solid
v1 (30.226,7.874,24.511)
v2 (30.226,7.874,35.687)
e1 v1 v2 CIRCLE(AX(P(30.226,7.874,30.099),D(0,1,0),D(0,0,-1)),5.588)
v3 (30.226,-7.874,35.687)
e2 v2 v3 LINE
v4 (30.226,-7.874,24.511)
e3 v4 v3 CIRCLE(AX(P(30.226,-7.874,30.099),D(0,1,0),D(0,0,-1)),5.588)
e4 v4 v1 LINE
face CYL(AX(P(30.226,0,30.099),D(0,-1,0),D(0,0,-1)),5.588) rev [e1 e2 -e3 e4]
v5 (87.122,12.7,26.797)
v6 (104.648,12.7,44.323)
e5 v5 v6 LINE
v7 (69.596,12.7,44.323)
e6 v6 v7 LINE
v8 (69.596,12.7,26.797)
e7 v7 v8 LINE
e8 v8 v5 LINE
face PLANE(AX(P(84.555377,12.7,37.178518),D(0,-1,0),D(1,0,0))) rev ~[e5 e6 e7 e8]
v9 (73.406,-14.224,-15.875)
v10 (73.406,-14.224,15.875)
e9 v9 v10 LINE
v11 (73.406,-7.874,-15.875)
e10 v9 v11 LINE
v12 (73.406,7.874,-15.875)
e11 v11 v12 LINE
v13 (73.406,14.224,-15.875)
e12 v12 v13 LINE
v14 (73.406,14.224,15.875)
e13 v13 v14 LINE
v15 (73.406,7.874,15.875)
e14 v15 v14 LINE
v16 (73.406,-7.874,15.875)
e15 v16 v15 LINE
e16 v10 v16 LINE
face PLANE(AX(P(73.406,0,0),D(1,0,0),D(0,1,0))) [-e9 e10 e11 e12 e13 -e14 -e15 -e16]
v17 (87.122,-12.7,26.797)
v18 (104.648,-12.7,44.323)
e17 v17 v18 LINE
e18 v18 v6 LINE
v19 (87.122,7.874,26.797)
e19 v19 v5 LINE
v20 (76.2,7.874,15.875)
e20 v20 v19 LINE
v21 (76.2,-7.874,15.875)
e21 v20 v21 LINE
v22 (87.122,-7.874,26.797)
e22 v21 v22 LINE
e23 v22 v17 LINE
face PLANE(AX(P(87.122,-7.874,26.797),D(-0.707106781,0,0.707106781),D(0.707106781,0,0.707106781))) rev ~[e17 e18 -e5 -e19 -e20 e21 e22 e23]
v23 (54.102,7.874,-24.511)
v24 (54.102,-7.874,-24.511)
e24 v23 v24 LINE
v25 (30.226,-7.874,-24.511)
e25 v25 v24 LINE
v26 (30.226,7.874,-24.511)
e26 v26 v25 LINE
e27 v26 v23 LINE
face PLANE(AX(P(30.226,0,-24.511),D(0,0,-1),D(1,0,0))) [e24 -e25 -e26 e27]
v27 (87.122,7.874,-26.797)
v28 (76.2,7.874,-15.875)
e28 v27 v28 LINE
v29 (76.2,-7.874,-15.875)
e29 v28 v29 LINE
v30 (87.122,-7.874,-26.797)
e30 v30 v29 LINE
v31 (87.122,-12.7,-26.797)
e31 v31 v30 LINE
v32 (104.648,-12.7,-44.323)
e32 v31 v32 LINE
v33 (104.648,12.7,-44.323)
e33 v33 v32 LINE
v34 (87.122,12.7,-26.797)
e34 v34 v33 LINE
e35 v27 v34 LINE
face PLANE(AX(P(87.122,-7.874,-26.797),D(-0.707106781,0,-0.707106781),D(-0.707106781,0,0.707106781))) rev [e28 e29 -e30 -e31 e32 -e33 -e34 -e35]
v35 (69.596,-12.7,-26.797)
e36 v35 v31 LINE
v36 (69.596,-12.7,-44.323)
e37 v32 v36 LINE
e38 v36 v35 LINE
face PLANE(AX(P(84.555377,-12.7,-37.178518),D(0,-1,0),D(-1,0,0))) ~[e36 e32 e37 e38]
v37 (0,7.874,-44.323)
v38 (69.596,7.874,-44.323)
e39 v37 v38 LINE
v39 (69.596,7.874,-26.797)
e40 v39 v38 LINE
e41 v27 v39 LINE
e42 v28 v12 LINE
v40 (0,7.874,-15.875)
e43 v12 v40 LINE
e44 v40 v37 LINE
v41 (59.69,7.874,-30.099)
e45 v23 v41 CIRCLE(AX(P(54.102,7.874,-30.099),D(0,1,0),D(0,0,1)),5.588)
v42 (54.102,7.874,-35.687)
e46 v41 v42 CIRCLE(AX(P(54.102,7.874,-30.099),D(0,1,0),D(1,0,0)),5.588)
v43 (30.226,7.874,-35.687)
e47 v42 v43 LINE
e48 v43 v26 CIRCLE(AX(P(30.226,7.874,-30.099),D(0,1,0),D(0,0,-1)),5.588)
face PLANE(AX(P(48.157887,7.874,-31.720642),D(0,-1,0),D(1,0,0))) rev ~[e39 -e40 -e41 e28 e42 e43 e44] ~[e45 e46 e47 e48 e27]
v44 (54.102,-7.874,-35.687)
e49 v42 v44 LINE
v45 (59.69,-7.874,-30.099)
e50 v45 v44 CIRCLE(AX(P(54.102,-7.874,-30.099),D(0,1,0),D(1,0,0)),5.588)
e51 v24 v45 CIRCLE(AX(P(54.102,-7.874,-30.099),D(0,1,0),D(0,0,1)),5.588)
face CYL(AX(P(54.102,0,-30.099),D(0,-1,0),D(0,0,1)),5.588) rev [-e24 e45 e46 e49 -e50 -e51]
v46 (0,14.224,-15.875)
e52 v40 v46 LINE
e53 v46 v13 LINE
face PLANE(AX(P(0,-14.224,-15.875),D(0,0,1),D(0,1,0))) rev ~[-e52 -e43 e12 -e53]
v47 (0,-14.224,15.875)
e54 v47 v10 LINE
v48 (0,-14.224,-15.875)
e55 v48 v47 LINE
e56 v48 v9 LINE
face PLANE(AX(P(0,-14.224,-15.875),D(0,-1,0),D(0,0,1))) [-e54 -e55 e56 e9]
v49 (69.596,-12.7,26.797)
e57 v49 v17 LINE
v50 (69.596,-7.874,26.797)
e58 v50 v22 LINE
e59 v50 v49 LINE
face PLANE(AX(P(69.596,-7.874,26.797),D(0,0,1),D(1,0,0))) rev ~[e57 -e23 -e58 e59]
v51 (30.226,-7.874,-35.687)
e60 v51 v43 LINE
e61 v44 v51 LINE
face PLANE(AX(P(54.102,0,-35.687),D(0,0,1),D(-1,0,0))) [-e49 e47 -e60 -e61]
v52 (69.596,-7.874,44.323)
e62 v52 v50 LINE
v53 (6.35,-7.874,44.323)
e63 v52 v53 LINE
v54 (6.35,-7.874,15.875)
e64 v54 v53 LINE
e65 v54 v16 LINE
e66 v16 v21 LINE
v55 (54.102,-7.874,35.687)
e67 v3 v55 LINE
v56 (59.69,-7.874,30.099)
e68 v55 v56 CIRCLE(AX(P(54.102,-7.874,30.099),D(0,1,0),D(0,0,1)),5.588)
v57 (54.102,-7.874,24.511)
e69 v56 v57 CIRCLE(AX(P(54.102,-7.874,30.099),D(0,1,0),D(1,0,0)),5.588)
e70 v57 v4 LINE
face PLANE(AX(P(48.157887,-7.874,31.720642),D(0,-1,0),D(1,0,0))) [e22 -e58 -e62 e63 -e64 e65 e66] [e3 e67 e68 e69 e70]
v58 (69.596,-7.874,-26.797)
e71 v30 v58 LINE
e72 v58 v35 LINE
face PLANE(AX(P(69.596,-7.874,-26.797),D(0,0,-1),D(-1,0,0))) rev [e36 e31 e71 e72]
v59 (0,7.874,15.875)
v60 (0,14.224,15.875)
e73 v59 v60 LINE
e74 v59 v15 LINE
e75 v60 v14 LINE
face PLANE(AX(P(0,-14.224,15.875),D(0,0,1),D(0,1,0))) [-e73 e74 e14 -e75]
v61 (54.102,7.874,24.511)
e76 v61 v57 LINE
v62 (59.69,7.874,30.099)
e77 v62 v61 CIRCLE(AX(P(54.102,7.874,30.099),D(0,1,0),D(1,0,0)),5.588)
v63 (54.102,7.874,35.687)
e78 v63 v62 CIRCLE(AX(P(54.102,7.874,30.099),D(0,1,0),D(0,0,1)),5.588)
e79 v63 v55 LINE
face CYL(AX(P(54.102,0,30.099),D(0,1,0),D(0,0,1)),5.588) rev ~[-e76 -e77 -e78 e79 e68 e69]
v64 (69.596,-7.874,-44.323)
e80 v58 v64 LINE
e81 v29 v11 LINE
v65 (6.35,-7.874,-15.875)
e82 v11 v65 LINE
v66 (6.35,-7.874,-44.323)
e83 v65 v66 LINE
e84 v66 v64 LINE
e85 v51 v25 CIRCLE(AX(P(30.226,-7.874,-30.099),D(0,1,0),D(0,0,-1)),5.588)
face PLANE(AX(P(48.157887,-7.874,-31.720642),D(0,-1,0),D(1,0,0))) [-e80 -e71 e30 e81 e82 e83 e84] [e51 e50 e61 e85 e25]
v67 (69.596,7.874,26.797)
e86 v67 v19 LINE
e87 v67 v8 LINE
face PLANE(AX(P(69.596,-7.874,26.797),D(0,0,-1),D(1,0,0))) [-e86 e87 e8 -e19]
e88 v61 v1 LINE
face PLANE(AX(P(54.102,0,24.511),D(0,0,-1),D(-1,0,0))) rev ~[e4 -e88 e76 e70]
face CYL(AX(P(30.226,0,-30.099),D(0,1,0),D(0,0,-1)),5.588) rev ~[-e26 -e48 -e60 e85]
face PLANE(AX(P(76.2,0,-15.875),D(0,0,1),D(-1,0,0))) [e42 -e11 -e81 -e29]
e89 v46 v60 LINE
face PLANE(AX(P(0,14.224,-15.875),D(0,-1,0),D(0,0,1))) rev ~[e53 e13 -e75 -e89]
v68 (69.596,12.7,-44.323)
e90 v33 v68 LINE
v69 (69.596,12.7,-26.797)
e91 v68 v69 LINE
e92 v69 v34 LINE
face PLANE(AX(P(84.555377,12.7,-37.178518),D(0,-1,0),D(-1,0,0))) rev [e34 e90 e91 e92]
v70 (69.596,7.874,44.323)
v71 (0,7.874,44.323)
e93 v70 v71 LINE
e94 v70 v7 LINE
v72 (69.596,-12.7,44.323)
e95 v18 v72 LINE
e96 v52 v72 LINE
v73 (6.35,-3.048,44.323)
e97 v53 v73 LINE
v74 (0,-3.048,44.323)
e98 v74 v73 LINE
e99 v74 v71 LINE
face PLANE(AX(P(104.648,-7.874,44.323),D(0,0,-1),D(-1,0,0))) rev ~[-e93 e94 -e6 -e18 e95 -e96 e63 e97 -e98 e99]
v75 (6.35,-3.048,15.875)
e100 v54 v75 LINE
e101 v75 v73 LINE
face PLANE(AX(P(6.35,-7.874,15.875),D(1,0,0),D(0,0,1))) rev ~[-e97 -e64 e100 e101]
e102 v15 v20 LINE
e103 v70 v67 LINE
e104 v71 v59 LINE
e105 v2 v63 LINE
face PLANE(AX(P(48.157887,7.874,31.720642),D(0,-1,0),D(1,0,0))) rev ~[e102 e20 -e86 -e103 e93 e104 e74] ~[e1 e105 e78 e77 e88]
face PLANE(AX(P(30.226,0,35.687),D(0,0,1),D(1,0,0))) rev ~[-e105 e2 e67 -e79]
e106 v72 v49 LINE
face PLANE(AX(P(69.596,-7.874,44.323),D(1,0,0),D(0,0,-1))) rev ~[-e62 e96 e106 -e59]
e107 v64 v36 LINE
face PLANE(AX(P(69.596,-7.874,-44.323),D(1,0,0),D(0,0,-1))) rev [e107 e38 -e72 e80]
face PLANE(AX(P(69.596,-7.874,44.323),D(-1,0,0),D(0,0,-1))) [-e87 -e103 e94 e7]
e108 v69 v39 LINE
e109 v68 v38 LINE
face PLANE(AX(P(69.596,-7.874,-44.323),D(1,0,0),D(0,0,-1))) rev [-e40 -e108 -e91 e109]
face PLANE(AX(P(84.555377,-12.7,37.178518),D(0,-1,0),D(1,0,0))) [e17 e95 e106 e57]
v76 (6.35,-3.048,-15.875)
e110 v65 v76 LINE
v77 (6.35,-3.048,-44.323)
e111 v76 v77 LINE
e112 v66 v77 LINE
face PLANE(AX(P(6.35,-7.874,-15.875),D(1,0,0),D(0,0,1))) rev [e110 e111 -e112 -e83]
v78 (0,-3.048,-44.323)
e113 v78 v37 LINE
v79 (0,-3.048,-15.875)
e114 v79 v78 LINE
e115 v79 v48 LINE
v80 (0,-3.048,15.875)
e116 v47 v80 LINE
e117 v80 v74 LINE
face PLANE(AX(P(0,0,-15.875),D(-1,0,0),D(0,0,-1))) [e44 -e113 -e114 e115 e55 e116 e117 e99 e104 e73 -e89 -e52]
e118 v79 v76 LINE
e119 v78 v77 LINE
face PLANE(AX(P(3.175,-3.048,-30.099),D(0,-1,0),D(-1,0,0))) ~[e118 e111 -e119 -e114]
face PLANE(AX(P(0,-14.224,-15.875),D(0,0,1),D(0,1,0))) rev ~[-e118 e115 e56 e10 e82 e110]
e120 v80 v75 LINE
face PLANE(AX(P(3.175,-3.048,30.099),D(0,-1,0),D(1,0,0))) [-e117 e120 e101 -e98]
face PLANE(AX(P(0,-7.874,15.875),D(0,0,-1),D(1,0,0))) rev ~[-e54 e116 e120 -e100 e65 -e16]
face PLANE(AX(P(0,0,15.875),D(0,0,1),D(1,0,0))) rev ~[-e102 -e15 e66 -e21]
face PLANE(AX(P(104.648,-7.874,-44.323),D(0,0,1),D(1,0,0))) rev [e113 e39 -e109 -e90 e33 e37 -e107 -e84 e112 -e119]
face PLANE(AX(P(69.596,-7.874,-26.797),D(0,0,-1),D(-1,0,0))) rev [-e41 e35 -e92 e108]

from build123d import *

# Parameters (mm, degrees)
F0_W          = 28.448
F0_H          = 31.75
F1_DEPTH      = 73.406
F3_DEPTH      = 7.874
F4_W          = 6.35
F4_H          = 28.448
F5_DEPTH      = 4.826
F6_DEPTH      = 4.826
F6_DEPTH_BACK = 20.574


# Not quite as in the source:
# - a pattern or mirror of a feature is missing from the dataset's text; its kind, count and spacing are read off the source's solid


with BuildPart() as f1:
    # F0 (on Right) → F1 (new body)
    with BuildSketch(Plane.YZ):
        Rectangle(F0_W, F0_H)
    extrude(amount=F1_DEPTH)

    # F2 (on Front) → F3 (join, symmetric)
    with BuildSketch(Plane.XZ):
        Polygon((0, 15.875), (73.406, 15.875), (76.2, 15.875), (104.648, 44.323), (0, 44.323), align=None)
        with BuildLine():
            ThreePointArc((30.226, 24.511), (24.638, 30.099), (30.226, 35.687))
            Line((30.226, 35.687), (54.102, 35.687))
            ThreePointArc((54.102, 35.687), (58.0533126933, 34.0503126933), (59.69, 30.099))
            ThreePointArc((59.69, 30.099), (58.0533126933, 26.1476873067), (54.102, 24.511))
            Line((54.102, 24.511), (30.226, 24.511))
        make_face(mode=Mode.SUBTRACT)
        Polygon((104.648, -44.323), (76.2, -15.875), (73.406, -15.875), (0, -15.875), (0, -44.323), align=None)
        with BuildLine():
            ThreePointArc((30.226, -35.687), (24.638, -30.099), (30.226, -24.511))
            Line((30.226, -24.511), (54.102, -24.511))
            ThreePointArc((54.102, -24.511), (58.0533126933, -26.1476873067), (59.69, -30.099))
            ThreePointArc((59.69, -30.099), (58.0533126933, -34.0503126933), (54.102, -35.687))
            Line((54.102, -35.687), (30.226, -35.687))
        make_face(mode=Mode.SUBTRACT)
    extrude(amount=F3_DEPTH, both=True)

    # F4 (on face) → F5 (cut)
    with BuildSketch(Plane.XZ.offset(7.874)):
        with Locations((3.175, 30.099)):
            Rectangle(F4_W, F4_H)
    f5 = extrude(amount=-F5_DEPTH, mode=Mode.SUBTRACT)

    # F5_copies: F5 across plane
    add(f5.mirror(Plane(origin=(0, 0, 0), x_dir=(-1, 0, 0), z_dir=(0, 0, -1))), mode=Mode.SUBTRACT)

    # F4 (on face) → F6 (join, two sides)
    with BuildSketch(Plane.XZ.offset(7.874)) as f6_sk:
        Polygon((104.648, 44.323), (69.596, 44.323), (69.596, 26.797), (87.122, 26.797), align=None)
    f6 = extrude(amount=F6_DEPTH) + extrude(f6_sk.sketch, amount=-F6_DEPTH_BACK)

    # F6_copies: F6 across plane
    add(f6.mirror(Plane(origin=(0, 0, 0), x_dir=(-1, 0, 0), z_dir=(0, 0, -1))))


solid = f1.part
